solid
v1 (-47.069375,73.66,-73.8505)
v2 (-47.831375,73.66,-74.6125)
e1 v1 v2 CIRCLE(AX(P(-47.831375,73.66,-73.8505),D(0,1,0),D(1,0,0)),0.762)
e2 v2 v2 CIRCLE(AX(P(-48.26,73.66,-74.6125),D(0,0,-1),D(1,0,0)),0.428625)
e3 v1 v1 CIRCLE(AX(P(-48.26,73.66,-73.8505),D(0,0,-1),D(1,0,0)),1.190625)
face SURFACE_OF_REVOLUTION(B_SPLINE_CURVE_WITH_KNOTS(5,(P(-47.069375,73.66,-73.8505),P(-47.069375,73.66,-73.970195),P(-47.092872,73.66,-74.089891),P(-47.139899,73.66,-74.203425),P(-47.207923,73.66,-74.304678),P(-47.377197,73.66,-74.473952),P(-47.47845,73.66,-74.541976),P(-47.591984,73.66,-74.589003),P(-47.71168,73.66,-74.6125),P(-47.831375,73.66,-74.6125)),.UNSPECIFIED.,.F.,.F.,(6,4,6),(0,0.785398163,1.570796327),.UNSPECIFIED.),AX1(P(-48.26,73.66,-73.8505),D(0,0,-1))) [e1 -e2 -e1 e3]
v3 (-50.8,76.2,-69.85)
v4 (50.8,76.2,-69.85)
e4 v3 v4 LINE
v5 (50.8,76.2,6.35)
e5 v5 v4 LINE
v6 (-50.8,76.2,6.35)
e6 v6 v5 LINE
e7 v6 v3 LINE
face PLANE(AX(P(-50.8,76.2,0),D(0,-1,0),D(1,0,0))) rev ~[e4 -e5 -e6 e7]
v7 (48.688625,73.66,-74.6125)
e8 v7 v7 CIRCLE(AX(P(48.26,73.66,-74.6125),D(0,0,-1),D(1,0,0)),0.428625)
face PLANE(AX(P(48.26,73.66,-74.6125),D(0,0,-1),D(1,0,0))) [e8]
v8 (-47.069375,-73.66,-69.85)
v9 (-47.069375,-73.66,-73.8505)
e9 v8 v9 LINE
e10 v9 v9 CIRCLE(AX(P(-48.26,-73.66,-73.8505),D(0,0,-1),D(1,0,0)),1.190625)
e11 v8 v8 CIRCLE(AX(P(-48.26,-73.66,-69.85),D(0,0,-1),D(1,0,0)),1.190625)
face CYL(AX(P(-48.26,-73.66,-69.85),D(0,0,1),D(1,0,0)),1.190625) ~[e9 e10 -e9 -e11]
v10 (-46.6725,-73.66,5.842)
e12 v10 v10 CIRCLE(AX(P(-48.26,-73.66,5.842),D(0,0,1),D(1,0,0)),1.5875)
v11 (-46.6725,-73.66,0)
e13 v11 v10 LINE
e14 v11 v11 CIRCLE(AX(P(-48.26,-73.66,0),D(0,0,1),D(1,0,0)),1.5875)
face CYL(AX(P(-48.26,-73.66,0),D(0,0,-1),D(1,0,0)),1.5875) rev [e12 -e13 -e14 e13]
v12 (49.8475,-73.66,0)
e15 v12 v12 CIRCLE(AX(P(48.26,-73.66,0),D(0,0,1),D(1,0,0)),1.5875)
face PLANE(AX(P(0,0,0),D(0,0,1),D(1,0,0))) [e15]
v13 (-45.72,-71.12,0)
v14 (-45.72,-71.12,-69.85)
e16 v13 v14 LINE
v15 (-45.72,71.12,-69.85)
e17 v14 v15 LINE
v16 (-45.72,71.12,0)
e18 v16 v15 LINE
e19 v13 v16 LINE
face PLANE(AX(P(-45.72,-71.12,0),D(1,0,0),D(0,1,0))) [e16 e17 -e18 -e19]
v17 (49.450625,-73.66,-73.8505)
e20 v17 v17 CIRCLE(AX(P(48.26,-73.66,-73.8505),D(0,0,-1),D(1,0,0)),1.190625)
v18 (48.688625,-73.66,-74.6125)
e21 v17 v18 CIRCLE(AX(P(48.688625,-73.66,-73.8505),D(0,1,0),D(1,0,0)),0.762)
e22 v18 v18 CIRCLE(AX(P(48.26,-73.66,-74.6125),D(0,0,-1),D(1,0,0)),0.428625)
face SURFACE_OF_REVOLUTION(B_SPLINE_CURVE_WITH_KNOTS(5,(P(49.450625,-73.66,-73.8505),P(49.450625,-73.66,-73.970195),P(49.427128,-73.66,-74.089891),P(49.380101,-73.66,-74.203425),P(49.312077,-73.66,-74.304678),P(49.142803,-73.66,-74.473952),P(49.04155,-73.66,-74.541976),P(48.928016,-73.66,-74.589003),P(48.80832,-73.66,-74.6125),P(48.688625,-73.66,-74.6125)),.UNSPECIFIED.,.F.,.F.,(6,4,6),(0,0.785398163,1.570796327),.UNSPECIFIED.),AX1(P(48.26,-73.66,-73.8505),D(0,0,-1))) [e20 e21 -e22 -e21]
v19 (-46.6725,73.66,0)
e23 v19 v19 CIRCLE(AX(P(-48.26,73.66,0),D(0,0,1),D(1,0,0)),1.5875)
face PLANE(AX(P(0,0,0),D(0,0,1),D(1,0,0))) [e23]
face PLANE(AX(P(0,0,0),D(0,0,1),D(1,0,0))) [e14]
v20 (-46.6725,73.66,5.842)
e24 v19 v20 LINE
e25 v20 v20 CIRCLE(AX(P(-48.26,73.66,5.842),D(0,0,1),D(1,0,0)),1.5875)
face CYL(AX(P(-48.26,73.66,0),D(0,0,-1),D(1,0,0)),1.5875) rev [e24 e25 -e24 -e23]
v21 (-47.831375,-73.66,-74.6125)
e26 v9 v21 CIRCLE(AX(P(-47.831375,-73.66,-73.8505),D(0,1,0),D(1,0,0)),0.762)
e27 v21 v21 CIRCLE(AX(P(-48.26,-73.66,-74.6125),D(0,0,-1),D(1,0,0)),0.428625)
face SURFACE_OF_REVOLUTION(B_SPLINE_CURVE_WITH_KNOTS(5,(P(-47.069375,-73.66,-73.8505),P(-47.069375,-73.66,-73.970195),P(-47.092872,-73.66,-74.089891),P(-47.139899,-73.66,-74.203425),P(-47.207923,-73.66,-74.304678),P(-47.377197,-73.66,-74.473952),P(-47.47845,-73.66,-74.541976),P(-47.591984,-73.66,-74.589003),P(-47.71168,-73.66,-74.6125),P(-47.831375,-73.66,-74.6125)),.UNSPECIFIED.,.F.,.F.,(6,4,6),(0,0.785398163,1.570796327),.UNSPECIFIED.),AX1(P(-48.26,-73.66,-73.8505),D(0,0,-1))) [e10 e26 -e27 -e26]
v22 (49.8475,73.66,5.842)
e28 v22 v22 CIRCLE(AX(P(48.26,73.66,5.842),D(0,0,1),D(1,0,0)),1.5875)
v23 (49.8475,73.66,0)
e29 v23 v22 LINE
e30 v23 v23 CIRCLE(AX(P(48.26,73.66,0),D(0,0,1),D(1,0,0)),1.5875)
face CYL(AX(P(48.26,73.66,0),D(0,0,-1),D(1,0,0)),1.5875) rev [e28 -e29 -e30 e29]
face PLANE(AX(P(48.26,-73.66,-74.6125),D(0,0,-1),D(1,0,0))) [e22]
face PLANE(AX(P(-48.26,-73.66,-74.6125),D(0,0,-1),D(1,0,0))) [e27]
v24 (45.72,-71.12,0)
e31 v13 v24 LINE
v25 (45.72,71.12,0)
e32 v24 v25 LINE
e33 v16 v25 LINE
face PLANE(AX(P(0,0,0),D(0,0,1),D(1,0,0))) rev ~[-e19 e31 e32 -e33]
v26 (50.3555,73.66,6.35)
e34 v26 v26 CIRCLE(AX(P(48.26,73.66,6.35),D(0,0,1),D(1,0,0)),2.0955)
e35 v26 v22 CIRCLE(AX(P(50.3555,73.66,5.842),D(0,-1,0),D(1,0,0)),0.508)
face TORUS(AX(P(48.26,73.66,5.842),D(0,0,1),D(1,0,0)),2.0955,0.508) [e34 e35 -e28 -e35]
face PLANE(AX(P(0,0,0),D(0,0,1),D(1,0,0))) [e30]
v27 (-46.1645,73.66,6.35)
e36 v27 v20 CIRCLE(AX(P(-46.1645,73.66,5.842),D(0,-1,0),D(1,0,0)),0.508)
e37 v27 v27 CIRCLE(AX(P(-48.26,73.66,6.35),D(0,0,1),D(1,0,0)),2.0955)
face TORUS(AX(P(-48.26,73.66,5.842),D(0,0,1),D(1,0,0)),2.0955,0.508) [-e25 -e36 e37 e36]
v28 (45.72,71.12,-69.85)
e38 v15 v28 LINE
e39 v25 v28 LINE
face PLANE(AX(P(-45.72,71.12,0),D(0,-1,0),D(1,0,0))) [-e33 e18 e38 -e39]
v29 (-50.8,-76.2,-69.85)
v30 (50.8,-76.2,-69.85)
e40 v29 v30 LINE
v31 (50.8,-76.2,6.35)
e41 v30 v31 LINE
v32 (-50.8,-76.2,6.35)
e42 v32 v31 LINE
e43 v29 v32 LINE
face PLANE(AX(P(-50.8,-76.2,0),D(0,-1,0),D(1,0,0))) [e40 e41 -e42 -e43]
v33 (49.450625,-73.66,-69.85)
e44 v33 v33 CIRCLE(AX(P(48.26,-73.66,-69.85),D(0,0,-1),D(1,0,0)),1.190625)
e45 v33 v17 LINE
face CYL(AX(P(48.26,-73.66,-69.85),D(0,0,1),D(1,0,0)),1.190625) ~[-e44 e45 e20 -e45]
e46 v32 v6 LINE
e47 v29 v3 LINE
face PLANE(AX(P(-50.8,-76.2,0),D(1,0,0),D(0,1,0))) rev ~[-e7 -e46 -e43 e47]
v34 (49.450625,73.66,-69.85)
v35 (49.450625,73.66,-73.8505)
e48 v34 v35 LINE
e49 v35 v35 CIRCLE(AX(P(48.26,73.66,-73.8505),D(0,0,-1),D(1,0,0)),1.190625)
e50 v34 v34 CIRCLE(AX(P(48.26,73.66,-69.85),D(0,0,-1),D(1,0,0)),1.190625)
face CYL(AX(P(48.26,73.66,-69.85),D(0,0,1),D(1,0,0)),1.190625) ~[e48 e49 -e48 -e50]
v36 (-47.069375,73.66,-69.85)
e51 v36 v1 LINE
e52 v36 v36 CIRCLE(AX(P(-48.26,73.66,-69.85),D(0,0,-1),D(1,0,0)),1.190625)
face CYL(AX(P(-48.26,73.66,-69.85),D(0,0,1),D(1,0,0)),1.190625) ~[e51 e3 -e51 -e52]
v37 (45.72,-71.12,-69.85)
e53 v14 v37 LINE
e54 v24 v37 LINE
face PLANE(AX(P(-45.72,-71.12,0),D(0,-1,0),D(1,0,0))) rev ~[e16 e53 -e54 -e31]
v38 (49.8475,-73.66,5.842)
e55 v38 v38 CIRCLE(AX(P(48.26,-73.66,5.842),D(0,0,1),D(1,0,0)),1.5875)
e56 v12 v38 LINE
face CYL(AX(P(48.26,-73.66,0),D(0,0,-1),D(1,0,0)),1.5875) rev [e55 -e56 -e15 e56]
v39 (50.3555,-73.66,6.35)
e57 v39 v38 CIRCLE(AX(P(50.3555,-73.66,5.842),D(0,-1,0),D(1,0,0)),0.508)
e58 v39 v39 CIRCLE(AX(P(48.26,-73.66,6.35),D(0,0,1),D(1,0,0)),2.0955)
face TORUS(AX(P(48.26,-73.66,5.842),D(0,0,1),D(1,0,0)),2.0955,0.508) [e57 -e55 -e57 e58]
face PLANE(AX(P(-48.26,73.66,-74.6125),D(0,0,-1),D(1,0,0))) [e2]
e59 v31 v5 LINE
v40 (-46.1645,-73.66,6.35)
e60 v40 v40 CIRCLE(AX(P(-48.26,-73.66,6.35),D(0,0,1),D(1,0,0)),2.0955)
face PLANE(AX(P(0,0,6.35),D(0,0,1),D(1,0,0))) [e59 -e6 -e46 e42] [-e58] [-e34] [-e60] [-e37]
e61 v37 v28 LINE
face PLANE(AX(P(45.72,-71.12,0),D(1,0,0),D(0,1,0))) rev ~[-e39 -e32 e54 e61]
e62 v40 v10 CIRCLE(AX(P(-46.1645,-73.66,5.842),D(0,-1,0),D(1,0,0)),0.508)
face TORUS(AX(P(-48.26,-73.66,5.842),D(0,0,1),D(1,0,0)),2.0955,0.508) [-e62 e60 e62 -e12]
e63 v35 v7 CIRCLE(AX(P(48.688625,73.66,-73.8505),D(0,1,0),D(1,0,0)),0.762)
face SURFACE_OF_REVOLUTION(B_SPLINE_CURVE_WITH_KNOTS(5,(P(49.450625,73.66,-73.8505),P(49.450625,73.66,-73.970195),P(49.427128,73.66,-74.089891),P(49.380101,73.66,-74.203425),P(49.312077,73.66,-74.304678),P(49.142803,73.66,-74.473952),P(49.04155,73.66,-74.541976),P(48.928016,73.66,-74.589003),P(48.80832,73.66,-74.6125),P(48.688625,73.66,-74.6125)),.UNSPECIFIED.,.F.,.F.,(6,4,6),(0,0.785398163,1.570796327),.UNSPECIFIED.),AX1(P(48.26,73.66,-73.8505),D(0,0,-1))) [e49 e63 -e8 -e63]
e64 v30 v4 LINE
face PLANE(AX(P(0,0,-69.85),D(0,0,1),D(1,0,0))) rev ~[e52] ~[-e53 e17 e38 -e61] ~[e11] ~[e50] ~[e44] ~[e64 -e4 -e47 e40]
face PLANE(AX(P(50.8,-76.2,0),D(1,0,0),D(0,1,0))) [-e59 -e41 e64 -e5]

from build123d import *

# Parameters (mm, degrees)
F0_W     = 101.6
F0_H     = 152.4
F0_R     = 1.5875
F0_W_2   = 91.44
F0_H_2   = 142.24
F1_DEPTH = 6.35
F2_DEPTH = 69.85
F3_R     = 1.190625
F4_DEPTH = 4.7625
F5_R     = 0.762
F6_R     = 0.508


# Not quite as in the source:
# - a length typed as a fraction of an inch, garbled in the dataset ("3 / 203.2 mm" for 3/8 in), is restored


with BuildPart() as f1:
    # F0 (on Top) → F1 (new body)
    with BuildSketch(Plane.XY):
        Rectangle(F0_W, F0_H)
        with Locations((-48.26, -73.66)):
            Circle(F0_R, mode=Mode.SUBTRACT)
        with Locations((48.26, -73.66)):
            Circle(F0_R, mode=Mode.SUBTRACT)
        Rectangle(F0_W_2, F0_H_2, mode=Mode.SUBTRACT)
        with Locations((-48.26, 73.66)):
            Circle(F0_R, mode=Mode.SUBTRACT)
        with Locations((48.26, 73.66)):
            Circle(F0_R, mode=Mode.SUBTRACT)
        Rectangle(F0_W_2, F0_H_2)
    extrude(amount=F1_DEPTH)

    # F0 (on Top) → F2 (join)
    with BuildSketch(Plane.XY):
        Rectangle(F0_W, F0_H)
        with Locations((-48.26, -73.66)):
            Circle(F0_R, mode=Mode.SUBTRACT)
        with Locations((48.26, -73.66)):
            Circle(F0_R, mode=Mode.SUBTRACT)
        Rectangle(F0_W_2, F0_H_2, mode=Mode.SUBTRACT)
        with Locations((-48.26, 73.66)):
            Circle(F0_R, mode=Mode.SUBTRACT)
        with Locations((48.26, 73.66)):
            Circle(F0_R, mode=Mode.SUBTRACT)
        with Locations((48.26, -73.66)):
            Circle(F0_R)
        with Locations((-48.26, -73.66)):
            Circle(F0_R)
        with Locations((-48.26, 73.66)):
            Circle(F0_R)
        with Locations((48.26, 73.66)):
            Circle(F0_R)
    extrude(amount=-F2_DEPTH)

    # F3 (on face) → F4 (join)
    with BuildSketch(Plane(origin=(0, 0, -69.85), x_dir=(1, 0, 0), z_dir=(0, 0, -1))):
        with Locations((48.26, 73.66)):
            Circle(F3_R)
        with Locations((48.26, -73.66)):
            Circle(F3_R)
        with Locations((-48.26, -73.66)):
            Circle(F3_R)
        with Locations((-48.26, 73.66)):
            Circle(F3_R)
    extrude(amount=F4_DEPTH)

    # F5
    f5_edges = [f1.edges().sort_by_distance(p)[0] for p in [
        (47.069375, -73.66, -74.6125),
        (-49.450625, -73.66, -74.6125),
        (-49.450625, 73.66, -74.6125),
        (47.069375, 73.66, -74.6125),
    ]]
    fillet(f5_edges, radius=F5_R)

    # F6
    f6_edges = [f1.edges().sort_by_distance(p)[0] for p in [
        (-49.8475, -73.66, 6.35),
        (-49.8475, 73.66, 6.35),
        (46.6725, 73.66, 6.35),
        (46.6725, -73.66, 6.35),
    ]]
    fillet(f6_edges, radius=F6_R)


solid = f1.part
